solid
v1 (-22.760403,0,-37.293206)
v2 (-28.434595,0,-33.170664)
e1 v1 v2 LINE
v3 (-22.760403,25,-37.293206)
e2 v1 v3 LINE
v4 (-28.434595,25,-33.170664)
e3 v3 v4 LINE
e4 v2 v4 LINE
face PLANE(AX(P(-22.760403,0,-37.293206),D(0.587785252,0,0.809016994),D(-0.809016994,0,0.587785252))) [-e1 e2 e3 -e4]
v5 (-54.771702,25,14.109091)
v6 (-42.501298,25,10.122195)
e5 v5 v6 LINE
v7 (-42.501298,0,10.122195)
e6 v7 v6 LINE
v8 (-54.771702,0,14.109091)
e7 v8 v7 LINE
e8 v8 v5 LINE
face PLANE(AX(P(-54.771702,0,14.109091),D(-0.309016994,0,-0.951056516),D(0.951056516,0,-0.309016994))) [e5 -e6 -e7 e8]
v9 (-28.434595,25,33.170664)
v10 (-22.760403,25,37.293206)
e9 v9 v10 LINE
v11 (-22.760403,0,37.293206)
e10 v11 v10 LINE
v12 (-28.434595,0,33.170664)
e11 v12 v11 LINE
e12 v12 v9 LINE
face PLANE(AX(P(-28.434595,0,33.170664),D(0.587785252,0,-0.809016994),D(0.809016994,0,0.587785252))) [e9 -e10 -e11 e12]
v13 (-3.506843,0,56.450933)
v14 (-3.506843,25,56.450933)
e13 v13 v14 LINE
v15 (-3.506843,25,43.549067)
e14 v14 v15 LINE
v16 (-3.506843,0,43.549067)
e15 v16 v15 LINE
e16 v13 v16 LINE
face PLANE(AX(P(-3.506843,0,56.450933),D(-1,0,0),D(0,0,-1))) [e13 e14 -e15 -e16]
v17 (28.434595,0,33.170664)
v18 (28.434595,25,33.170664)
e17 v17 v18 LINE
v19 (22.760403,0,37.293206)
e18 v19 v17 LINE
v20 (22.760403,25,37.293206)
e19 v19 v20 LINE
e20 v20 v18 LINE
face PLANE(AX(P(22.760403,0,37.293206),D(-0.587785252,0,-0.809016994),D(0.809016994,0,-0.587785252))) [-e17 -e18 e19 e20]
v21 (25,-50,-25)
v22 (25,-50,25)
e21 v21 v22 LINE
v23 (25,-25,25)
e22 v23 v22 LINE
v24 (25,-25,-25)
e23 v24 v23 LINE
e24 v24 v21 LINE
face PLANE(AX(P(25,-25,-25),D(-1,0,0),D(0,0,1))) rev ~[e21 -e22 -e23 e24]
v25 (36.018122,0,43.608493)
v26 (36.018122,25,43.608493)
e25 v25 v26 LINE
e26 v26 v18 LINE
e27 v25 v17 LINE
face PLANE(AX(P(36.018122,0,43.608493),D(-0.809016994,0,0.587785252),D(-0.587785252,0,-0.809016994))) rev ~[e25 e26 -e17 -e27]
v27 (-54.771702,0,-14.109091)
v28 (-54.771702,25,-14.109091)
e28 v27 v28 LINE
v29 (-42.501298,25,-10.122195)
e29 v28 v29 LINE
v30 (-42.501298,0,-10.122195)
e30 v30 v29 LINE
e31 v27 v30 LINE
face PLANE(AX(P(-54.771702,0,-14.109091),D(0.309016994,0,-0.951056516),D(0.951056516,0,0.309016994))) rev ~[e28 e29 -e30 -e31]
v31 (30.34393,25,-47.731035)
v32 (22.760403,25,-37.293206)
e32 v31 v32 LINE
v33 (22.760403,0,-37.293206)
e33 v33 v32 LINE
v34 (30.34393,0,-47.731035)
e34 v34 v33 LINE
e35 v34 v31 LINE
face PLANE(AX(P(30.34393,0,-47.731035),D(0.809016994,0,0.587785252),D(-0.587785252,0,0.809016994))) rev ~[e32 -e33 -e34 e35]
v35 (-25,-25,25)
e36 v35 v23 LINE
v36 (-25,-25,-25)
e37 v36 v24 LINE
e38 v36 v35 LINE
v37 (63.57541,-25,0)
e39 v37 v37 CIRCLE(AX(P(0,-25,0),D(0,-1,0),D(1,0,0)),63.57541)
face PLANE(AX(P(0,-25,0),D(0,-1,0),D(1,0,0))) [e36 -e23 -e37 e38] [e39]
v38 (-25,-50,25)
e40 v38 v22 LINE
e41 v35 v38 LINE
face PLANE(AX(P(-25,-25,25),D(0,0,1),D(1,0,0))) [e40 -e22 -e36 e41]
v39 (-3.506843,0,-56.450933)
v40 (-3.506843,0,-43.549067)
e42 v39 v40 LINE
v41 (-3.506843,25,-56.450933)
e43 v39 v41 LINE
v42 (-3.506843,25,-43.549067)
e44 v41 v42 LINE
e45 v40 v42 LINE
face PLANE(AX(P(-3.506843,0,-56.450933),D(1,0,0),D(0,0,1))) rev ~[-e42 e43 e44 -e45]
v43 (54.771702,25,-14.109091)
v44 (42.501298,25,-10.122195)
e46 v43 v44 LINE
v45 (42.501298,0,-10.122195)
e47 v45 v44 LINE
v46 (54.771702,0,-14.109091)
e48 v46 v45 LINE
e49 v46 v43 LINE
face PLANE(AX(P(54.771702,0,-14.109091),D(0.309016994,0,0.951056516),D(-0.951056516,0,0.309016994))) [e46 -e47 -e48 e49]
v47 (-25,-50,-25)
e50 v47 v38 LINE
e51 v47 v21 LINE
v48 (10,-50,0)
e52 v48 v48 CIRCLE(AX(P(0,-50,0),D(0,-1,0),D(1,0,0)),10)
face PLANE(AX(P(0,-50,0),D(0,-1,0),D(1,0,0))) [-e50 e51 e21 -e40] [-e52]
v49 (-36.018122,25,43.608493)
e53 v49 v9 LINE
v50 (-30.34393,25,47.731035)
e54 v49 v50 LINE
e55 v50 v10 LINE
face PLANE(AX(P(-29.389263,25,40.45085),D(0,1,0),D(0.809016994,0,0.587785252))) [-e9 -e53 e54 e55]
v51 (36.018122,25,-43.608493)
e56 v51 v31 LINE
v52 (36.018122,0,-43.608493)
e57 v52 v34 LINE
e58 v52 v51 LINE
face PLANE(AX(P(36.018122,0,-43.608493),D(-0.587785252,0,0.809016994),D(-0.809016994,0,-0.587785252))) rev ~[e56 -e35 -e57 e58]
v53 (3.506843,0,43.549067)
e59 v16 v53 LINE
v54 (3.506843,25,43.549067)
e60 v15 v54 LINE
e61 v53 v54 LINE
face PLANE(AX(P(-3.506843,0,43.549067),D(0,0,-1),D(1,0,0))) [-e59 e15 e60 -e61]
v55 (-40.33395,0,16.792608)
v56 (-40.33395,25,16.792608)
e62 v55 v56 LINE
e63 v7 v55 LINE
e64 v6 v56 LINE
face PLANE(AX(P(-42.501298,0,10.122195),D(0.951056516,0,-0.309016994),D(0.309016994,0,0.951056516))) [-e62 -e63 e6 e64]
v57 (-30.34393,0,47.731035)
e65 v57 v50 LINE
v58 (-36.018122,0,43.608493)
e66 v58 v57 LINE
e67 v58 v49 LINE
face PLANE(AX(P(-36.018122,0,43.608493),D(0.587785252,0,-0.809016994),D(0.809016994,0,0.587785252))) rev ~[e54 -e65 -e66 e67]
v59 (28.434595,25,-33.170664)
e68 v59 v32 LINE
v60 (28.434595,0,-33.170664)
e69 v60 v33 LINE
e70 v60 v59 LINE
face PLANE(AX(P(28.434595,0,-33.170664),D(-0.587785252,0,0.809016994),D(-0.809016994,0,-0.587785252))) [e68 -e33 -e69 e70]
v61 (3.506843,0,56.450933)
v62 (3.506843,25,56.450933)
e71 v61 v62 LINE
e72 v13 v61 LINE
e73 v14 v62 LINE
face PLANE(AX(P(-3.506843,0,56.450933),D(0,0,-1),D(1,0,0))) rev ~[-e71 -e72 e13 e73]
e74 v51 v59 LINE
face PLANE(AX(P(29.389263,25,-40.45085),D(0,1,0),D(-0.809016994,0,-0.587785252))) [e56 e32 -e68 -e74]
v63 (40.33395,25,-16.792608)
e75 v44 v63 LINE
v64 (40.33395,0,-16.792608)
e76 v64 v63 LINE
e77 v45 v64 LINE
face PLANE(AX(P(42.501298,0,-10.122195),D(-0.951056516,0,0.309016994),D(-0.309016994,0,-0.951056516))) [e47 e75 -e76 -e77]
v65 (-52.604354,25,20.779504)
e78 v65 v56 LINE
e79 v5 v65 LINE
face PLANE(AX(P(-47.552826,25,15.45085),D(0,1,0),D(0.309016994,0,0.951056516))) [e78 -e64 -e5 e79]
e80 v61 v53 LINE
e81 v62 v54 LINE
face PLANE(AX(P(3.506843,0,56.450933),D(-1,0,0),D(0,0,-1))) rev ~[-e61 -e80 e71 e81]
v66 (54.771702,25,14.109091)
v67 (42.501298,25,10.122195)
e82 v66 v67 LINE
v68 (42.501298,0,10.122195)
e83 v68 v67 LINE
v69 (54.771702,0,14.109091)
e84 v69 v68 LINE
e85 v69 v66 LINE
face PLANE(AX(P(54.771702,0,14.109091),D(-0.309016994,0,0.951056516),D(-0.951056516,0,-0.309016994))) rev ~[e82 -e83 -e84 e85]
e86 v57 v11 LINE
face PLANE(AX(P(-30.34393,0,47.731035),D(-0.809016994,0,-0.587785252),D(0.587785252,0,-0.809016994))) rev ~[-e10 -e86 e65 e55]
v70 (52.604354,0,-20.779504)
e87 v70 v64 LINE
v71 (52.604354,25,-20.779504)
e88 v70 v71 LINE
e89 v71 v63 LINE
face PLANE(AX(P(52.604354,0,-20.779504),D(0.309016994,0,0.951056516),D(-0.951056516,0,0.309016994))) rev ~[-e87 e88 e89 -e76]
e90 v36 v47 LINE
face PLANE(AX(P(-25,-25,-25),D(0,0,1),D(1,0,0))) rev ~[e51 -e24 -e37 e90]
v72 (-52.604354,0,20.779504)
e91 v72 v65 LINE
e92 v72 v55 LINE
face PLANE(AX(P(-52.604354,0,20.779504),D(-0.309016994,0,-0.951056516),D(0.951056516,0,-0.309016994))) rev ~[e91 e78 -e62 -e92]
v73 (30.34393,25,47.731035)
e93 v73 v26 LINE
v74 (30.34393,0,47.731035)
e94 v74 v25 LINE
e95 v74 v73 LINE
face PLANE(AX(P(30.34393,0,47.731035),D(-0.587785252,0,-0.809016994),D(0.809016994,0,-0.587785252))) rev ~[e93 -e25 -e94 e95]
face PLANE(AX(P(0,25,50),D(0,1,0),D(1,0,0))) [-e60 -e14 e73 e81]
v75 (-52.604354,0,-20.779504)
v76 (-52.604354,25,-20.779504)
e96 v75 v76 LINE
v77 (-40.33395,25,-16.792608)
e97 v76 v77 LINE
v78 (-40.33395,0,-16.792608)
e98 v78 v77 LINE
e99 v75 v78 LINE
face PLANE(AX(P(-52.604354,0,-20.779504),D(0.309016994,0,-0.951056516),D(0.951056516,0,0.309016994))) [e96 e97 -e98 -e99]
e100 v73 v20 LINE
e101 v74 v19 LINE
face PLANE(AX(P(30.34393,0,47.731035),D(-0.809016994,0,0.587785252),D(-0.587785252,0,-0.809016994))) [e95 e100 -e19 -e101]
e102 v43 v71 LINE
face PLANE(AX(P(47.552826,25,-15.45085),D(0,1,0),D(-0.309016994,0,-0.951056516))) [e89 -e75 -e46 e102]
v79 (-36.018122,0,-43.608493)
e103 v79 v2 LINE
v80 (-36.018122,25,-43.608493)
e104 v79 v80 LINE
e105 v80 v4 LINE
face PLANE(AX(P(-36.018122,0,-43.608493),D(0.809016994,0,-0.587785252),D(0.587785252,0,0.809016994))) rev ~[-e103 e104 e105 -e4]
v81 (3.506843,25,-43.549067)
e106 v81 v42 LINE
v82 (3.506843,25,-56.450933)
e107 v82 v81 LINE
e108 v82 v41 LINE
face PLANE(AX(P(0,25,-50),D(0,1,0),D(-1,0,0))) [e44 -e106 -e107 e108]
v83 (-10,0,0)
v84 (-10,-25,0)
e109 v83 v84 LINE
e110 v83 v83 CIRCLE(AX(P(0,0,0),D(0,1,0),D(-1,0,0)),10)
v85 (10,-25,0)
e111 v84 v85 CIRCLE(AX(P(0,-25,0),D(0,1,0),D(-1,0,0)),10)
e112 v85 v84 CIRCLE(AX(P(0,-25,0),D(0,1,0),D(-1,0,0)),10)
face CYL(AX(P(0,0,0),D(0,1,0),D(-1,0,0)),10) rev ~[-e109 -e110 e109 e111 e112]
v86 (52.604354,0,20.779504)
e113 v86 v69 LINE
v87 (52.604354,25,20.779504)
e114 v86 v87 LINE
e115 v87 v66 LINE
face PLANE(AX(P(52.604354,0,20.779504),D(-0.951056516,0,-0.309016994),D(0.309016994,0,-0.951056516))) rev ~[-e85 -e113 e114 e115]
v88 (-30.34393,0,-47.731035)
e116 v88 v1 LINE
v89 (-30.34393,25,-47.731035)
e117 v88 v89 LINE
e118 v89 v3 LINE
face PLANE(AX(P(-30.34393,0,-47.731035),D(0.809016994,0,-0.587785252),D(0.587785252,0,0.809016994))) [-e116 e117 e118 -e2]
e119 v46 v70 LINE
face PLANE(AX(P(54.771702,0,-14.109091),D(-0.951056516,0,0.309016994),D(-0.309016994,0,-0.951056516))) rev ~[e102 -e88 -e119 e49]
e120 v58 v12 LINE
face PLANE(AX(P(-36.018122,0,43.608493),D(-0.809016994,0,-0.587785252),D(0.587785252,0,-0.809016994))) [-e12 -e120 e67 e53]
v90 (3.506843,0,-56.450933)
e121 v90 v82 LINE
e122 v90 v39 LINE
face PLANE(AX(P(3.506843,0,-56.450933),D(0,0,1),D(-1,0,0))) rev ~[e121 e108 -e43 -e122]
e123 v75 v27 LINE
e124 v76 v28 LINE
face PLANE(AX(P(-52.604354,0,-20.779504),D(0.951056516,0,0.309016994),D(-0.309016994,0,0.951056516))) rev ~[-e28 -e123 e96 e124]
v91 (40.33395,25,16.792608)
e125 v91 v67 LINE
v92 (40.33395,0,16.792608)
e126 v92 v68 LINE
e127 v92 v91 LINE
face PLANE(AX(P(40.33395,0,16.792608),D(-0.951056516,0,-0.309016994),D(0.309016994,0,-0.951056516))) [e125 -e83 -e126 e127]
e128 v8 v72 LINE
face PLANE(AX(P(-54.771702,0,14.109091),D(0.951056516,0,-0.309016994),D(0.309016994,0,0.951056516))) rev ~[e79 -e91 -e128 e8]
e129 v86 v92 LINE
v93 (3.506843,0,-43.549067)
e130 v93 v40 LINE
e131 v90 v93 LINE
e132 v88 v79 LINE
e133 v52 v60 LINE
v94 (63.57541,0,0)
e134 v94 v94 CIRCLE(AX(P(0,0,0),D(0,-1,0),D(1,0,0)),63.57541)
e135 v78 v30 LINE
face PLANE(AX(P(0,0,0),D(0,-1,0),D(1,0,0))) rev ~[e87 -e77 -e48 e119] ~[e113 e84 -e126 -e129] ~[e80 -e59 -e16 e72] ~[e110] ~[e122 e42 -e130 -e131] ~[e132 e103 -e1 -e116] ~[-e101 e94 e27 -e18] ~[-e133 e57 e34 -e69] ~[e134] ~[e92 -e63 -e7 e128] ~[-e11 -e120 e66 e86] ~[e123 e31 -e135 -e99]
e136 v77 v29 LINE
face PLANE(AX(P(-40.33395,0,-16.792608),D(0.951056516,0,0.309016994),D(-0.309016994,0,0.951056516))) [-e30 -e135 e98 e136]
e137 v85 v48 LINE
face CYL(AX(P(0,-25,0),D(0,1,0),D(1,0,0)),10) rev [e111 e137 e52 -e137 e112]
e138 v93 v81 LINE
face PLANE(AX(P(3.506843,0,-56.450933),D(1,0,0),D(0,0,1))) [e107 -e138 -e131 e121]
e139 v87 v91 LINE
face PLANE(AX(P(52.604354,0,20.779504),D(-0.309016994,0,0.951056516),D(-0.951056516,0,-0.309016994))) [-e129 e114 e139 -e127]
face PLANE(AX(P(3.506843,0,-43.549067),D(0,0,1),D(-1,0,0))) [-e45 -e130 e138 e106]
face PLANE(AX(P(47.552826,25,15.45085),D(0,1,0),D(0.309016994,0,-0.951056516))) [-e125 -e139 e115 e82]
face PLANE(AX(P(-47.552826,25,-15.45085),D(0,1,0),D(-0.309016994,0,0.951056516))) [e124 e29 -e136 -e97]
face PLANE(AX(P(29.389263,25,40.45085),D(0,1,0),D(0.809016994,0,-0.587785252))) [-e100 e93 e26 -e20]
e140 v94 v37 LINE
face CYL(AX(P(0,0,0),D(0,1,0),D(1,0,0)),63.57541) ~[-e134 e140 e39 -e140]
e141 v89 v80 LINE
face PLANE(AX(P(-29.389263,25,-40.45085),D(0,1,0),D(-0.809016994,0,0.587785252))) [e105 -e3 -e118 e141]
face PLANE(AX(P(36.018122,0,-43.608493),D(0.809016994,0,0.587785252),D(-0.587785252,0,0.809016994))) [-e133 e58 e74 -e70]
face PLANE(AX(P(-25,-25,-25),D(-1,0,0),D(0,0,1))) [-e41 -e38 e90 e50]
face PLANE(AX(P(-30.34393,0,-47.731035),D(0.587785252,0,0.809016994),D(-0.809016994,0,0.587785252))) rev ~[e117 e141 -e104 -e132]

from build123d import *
from build123d import SkipClean  # not in build123d's __all__

# Parameters (mm, degrees)
F0_R     = 63.5754098613
F1_DEPTH = 25
F2_R     = 10
F3_DEPTH = 25.001
F4_W     = 50
F4_H     = 50
F4_R     = 10
F5_DEPTH = 25
F6_W     = 7.0136869326
F6_H     = 12.901866436
F7_DEPTH = 25
F8_COUNT = 10


# Not quite as in the source:
# - after a boolean that leaves OpenCascade's solid faulty, fix() repairs it


with BuildPart() as f1:
    # F0 (on Front) → F1 (new body)
    with BuildSketch(Plane.XZ):
        Circle(F0_R)
    extrude(amount=F1_DEPTH)

    # F2 (on face) → F3 (cut, through all)
    with BuildSketch(Plane(origin=(0, 0, 0), x_dir=(-1, 0, 0), z_dir=(0, 1, 0))):
        Circle(F2_R)
    extrude(amount=-F3_DEPTH, mode=Mode.SUBTRACT)

    # F4 (on face) → F5 (join)
    with BuildSketch(Plane.XZ.offset(25)):
        Rectangle(F4_W, F4_H)
        Circle(F4_R, mode=Mode.SUBTRACT)
    with SkipClean():  # cleaning this boolean's faces spoils the solid; the shape is the same uncleaned
        extrude(amount=F5_DEPTH)

    # F6 (on face) → F7 (join)
    with BuildSketch(Plane(origin=(0, 0, 0), x_dir=(-1, 0, 0), z_dir=(0, 1, 0))):
        with Locations((0, -50)):
            Rectangle(F6_W, F6_H)
    f7 = extrude(amount=F7_DEPTH)

    add(f1.part.fix(), mode=Mode.REPLACE)

    # F8: F7 ×10 about axis
    f8_axis = Axis((0, 0, 0), (0, -1, 0))
    for i in range(1, F8_COUNT):
        add(f7.rotate(f8_axis, i * 360 / F8_COUNT), clean=False)


solid = f1.part
